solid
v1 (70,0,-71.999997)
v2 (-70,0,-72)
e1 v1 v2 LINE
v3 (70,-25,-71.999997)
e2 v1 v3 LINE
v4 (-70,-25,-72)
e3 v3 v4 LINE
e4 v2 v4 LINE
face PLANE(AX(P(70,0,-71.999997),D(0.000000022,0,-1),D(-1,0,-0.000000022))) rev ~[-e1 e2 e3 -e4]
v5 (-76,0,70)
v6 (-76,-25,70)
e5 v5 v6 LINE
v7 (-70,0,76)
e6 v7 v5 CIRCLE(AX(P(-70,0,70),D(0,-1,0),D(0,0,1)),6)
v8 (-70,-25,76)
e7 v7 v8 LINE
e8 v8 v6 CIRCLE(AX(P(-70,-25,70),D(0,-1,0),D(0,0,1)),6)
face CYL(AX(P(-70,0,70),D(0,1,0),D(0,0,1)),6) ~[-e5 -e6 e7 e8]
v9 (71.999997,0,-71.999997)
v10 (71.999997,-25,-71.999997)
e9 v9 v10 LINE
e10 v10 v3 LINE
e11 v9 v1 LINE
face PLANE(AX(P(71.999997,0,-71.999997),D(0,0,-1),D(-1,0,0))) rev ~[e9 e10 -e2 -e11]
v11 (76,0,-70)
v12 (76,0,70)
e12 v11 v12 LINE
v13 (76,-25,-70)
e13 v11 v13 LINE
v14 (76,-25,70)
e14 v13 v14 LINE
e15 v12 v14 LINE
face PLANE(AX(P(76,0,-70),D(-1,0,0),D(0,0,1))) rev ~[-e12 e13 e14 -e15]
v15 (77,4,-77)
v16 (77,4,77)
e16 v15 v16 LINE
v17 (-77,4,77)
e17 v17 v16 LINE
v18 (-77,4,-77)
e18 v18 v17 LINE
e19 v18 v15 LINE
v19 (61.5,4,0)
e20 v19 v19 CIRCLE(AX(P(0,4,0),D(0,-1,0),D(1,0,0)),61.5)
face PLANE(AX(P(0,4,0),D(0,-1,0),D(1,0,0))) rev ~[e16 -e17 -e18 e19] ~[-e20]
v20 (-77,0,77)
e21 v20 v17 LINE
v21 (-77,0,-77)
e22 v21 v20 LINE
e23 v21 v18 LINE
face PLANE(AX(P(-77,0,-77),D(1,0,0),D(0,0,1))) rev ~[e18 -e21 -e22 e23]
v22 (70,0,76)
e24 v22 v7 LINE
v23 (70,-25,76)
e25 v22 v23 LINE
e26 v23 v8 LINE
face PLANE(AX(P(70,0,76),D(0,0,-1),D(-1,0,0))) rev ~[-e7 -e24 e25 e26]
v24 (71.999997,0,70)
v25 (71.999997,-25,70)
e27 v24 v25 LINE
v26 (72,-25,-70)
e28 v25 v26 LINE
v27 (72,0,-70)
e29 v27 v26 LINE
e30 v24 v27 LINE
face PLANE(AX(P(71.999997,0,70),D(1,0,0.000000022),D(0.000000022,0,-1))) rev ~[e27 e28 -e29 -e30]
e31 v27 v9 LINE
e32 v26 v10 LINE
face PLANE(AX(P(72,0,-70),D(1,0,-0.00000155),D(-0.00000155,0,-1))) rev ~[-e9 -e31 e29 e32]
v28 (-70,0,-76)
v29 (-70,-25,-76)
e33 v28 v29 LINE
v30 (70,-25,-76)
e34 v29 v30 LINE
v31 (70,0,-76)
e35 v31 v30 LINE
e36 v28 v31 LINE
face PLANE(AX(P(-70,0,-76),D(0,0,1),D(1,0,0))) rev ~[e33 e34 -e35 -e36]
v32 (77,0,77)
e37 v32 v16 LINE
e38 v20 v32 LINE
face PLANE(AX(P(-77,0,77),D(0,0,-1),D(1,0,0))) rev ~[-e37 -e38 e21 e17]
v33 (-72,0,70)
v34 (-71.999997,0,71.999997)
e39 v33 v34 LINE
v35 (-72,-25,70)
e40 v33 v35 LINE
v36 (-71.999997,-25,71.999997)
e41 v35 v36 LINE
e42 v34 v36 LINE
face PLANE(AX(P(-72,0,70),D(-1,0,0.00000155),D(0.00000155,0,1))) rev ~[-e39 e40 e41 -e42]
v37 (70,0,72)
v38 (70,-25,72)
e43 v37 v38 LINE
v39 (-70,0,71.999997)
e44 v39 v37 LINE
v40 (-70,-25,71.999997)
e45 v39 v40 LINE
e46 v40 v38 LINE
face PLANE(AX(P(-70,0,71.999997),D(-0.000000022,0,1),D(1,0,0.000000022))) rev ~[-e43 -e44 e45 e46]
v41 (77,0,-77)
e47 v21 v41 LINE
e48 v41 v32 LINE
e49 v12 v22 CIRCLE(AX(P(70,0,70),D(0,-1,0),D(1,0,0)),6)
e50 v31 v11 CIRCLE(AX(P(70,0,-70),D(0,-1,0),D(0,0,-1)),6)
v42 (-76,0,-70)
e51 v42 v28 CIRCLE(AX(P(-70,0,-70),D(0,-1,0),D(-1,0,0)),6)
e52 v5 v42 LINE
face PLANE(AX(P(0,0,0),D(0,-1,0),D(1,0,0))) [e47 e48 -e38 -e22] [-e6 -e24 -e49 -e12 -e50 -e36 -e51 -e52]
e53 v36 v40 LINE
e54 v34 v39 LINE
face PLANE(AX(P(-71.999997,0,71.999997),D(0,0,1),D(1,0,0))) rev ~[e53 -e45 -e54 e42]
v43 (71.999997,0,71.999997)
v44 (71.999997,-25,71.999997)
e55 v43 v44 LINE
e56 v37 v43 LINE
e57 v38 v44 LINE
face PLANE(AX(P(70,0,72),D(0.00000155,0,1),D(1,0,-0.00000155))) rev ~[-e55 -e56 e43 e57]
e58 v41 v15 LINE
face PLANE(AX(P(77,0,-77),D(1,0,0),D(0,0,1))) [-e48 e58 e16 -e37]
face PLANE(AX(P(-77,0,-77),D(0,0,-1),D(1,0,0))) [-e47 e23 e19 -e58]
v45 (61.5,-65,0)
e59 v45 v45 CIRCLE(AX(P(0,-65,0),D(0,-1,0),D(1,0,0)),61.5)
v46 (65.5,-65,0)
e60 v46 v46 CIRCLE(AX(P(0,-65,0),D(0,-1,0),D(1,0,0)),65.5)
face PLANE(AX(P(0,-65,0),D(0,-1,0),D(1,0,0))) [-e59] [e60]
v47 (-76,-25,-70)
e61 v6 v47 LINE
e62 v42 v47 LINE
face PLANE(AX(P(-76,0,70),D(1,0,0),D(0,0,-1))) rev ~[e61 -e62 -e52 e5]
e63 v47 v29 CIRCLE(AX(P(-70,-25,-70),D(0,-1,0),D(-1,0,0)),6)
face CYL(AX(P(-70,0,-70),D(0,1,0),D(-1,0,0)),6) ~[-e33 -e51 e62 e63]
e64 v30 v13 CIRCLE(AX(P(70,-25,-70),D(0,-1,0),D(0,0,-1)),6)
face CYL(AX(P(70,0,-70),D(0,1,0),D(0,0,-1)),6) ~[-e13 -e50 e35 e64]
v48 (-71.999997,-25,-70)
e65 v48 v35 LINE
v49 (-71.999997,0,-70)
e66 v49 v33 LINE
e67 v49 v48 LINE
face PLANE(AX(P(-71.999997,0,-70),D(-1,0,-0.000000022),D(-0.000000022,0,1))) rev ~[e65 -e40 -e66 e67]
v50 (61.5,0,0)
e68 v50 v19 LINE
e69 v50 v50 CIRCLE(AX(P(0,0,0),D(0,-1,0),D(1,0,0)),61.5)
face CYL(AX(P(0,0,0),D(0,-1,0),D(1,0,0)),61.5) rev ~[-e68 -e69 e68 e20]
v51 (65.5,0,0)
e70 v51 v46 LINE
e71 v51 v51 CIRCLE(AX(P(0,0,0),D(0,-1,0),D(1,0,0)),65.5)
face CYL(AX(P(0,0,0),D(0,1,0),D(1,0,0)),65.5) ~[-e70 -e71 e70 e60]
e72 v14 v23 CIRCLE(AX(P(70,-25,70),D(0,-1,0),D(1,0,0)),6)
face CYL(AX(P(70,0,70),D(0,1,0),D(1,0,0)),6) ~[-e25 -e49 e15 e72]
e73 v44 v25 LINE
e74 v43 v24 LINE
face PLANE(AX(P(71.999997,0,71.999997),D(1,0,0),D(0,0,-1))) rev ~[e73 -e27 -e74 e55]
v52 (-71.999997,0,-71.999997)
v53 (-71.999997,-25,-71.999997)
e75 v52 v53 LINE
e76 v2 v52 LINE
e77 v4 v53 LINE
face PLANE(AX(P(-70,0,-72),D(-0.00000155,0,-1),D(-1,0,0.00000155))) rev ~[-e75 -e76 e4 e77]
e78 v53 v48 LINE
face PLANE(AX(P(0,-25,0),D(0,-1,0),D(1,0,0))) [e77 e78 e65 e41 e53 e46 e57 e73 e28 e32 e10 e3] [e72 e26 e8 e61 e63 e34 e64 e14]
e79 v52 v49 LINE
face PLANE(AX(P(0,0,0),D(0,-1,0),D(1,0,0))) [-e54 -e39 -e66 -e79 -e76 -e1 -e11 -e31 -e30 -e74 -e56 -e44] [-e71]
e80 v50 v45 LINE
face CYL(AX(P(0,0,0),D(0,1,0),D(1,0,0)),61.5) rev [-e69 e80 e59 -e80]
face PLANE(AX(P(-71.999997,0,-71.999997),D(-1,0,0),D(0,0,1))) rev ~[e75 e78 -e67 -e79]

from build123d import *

# Parameters (mm, degrees)
F0_W     = 154
F0_H     = 154
F1_DEPTH = 4
F3_DEPTH = 25
F4_R     = 65.5
F4_R_2   = 61.5
F5_DEPTH = 65
F6_DEPTH = 88.2


# Not quite as in the source:
# - ends of sketch curves that miss each other by under 0.0002 mm in the source are joined


with BuildPart() as f1:
    # F0 (on Front) → F1 (new body)
    with BuildSketch(Plane.XZ):
        Rectangle(F0_W, F0_H)
    extrude(amount=-F1_DEPTH)

    # F2 (on face) → F3 (join)
    with BuildSketch(Plane.XZ):
        with BuildLine():
            ThreePointArc((-76, -70), (-74.2426406871, -74.2426406871), (-70, -76))
            Line((-70, -76), (70, -76))
            ThreePointArc((70, -76), (74.2426406871, -74.2426406871), (76, -70))
            Line((76, -70), (76, 70))
            ThreePointArc((76, 70), (74.2426406871, 74.2426406871), (70, 76))
            Line((70, 76), (-70, 76))
            ThreePointArc((-70, 76), (-74.2426406871, 74.2426406871), (-76, 70))
            Line((-76, 70), (-76, -70))
        make_face()
        Polygon((-71.9999969006, 71.9999969006), (-70, 71.9999969006), (70, 72), (71.9999969006, 71.9999969006), (71.9999969006, 70), (72, -70), (71.9999969006, -71.9999969006), (70, -71.9999969006), (-70, -72), (-71.9999969006, -71.9999969006), (-71.9999969006, -70), (-72, 70), align=None, mode=Mode.SUBTRACT)
    extrude(amount=F3_DEPTH)

    # F4 (on face) → F5 (join)
    with BuildSketch(Plane.XZ):
        Circle(F4_R)
        Circle(F4_R_2, mode=Mode.SUBTRACT)
    extrude(amount=F5_DEPTH)

    # F6 (cut): a face of the model
    f6_faces = [f1.faces().sort_by_distance(p)[0] for p in [
        (0, 0, 0),
    ]]
    extrude(f6_faces, amount=-F6_DEPTH, mode=Mode.SUBTRACT)


solid = f1.part
